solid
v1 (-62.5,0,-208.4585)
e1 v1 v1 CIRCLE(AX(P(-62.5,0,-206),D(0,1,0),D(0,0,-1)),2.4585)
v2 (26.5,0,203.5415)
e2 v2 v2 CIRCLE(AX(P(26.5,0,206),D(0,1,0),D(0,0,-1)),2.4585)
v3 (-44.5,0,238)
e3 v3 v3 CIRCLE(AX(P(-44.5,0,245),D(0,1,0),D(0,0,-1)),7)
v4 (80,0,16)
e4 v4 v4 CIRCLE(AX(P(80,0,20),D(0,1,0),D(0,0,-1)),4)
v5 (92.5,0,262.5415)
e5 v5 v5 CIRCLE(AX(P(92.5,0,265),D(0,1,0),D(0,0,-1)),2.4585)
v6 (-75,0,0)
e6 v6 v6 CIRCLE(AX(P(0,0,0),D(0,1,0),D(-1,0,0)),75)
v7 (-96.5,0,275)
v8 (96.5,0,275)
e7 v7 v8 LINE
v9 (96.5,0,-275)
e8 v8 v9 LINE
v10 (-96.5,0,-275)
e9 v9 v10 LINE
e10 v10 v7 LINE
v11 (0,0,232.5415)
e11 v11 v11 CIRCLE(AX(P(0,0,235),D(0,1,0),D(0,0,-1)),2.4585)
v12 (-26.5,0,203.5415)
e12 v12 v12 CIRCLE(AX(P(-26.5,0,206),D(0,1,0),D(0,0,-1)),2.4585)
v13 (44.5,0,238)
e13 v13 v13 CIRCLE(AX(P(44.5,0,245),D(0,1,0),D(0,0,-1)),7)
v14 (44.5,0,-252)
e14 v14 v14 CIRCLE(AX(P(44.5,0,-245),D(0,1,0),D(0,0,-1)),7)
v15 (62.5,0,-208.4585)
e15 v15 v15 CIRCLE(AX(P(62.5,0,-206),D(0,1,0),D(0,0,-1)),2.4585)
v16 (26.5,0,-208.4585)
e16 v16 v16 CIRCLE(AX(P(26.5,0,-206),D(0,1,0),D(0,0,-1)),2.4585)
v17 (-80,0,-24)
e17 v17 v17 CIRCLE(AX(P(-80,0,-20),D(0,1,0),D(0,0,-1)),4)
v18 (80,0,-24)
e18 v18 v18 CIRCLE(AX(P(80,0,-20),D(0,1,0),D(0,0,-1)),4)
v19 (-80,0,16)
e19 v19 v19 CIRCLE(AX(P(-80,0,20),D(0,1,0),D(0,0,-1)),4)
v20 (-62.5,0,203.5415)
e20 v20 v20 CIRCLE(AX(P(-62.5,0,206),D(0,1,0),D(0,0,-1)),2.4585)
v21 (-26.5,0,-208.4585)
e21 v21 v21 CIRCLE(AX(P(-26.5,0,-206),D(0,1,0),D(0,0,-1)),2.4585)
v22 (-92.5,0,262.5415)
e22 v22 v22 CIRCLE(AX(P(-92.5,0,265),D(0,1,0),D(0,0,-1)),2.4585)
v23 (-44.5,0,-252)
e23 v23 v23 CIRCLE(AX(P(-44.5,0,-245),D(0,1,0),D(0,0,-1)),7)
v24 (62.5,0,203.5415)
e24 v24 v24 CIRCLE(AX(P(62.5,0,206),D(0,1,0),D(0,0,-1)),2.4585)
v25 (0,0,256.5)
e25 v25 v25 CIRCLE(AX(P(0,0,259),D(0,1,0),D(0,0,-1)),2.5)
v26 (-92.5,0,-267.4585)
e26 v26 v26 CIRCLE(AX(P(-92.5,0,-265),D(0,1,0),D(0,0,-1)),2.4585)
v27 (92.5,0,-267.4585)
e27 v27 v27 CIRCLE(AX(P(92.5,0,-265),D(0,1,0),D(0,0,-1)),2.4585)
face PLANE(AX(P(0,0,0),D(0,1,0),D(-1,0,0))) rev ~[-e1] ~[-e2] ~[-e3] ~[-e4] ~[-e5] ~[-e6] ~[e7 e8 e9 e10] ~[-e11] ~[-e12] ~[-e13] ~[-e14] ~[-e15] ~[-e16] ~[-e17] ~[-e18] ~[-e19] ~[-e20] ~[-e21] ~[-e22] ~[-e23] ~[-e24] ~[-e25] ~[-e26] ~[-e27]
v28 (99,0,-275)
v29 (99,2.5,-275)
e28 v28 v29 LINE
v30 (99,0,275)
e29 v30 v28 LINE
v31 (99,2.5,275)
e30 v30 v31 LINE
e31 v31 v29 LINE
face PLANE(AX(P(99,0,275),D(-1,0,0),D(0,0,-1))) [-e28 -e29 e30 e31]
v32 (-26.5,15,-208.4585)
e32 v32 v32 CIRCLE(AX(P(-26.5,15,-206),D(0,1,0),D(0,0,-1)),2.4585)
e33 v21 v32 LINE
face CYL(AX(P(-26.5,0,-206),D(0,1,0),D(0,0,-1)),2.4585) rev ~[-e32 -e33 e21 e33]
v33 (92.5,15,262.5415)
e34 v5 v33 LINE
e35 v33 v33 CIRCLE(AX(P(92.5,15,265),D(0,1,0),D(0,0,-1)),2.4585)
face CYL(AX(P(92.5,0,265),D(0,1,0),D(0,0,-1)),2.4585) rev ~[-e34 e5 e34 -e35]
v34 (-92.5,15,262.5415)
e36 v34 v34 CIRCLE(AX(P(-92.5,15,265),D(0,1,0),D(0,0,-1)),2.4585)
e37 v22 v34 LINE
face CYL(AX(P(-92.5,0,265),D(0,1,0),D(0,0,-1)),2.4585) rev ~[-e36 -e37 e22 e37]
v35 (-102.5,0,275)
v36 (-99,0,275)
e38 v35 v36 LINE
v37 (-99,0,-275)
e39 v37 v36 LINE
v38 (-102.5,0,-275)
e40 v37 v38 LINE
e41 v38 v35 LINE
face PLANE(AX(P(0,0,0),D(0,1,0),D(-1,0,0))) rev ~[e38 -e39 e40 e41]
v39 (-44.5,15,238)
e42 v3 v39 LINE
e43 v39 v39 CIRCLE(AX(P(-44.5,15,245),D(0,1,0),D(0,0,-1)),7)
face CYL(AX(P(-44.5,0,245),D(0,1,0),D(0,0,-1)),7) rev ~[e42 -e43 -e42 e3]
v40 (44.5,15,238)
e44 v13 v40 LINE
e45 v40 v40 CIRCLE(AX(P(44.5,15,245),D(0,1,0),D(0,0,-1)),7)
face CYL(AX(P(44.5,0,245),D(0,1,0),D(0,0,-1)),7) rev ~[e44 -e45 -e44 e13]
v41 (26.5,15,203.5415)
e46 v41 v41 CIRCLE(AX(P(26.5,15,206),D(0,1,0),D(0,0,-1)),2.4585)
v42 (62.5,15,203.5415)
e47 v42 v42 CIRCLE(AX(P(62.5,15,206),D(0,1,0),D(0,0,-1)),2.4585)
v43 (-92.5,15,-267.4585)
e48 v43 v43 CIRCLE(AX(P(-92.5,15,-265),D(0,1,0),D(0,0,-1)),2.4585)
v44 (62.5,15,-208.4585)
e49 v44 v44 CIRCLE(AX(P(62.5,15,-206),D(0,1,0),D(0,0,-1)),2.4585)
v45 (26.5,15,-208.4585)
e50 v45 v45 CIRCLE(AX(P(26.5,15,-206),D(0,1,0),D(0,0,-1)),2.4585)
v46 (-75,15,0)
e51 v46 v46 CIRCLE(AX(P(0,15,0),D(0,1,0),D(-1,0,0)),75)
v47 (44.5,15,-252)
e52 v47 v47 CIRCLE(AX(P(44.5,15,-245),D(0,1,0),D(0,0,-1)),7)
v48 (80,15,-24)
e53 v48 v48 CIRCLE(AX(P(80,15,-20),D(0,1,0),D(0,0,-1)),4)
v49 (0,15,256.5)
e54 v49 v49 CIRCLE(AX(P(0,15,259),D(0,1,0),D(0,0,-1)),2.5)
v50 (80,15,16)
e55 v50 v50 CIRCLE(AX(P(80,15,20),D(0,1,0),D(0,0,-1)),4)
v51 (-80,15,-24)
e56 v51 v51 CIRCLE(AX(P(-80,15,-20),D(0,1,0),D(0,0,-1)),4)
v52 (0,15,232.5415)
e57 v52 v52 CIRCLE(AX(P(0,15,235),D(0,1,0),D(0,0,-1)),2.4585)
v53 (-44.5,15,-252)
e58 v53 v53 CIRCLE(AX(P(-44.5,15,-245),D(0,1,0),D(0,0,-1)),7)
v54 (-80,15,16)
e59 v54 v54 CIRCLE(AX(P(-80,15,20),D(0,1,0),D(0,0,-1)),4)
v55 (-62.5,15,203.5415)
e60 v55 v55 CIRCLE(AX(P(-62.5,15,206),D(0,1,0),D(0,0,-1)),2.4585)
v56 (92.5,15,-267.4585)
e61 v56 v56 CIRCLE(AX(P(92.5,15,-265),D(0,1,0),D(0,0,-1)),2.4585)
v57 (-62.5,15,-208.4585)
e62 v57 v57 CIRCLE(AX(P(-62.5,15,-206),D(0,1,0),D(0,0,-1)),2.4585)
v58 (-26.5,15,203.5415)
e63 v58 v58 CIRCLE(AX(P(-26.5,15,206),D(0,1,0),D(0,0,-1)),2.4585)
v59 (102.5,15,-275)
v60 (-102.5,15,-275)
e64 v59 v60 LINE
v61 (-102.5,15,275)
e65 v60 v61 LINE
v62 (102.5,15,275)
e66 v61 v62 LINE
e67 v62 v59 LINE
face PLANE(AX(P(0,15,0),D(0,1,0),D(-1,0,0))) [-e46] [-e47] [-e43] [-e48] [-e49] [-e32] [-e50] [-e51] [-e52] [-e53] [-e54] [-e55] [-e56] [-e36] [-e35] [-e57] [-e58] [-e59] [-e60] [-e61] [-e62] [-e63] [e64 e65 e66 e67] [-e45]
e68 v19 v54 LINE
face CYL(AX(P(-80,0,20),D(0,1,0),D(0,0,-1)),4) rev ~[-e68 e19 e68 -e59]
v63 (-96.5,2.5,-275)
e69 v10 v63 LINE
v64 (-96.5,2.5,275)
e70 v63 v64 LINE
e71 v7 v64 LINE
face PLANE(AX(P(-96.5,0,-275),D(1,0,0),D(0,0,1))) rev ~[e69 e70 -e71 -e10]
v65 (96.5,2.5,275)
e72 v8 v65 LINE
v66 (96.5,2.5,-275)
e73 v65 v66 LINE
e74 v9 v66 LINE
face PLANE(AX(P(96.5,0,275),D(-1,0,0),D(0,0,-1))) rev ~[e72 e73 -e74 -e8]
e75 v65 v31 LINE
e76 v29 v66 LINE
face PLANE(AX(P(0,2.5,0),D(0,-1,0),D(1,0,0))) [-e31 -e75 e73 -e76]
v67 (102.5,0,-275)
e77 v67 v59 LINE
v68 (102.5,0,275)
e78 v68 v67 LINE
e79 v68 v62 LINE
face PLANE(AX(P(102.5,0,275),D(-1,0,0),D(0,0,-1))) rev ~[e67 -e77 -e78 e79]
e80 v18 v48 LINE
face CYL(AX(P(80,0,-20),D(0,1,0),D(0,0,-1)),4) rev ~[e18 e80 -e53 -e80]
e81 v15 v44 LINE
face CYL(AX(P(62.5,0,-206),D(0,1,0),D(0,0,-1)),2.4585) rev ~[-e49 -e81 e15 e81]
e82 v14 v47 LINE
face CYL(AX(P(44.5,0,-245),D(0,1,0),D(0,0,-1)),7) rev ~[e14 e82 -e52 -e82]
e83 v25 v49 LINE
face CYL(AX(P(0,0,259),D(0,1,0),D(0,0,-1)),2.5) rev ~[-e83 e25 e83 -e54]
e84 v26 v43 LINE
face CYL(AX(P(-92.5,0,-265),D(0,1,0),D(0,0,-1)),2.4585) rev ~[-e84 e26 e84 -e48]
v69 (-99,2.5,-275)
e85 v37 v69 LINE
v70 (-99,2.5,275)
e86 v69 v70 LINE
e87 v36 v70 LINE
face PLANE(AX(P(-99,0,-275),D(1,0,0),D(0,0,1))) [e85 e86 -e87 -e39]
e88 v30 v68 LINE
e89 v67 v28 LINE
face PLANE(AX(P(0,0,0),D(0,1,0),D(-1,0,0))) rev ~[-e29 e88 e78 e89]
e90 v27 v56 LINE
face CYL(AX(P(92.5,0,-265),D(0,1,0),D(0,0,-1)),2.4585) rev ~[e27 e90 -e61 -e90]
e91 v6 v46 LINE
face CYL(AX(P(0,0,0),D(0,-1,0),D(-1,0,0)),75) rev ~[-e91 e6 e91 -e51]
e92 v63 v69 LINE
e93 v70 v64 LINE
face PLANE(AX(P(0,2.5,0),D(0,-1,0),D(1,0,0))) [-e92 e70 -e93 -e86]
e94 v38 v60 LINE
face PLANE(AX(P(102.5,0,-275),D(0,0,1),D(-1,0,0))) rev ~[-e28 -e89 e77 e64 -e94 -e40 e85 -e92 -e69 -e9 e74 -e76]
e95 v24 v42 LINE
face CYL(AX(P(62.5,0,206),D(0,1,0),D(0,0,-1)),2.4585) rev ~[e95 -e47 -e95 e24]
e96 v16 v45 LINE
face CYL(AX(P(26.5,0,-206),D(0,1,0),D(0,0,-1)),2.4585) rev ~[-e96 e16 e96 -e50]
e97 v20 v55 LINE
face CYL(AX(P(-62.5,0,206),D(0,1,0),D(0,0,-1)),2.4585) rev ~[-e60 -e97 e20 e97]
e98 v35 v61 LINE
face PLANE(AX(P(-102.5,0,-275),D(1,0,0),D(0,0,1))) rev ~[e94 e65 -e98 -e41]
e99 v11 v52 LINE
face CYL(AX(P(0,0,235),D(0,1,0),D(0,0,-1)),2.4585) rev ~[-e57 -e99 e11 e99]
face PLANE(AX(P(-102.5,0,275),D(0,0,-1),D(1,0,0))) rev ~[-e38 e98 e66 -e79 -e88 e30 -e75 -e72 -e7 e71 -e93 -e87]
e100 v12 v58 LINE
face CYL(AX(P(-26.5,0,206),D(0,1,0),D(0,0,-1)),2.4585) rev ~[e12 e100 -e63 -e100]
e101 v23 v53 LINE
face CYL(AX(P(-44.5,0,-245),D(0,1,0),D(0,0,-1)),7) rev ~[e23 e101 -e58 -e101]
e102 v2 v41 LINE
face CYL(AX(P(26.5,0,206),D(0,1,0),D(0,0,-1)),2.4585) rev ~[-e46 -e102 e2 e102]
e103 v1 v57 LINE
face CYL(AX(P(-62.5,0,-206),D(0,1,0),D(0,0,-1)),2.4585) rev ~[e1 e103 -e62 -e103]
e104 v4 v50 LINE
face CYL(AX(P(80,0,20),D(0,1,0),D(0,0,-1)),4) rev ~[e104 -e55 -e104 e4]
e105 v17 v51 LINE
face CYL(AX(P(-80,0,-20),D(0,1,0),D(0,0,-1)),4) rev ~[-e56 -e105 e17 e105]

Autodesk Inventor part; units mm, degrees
ref_plane "YZ Plane" through (0, 0, 0) normal (1, 0, 0) x (0, 1, 0)
ref_plane "XZ Plane" through (0, 0, 0) normal (0, 1, 0) x (-1, 0, 0)
ref_plane "XY Plane" through (0, 0, 0) normal (0, 0, 1) x (1, 0, 0)
sketch "Skizze2" plane through (0, 0, 0) normal (0, 1, 0) x (-1, 0, 0)
  circle A0 centre (0, 0) radius 75
  line L0 (-102.5, -275) -> (102.5, -275)
  line L1 (102.5, -275) -> (102.5, 275)
  line L2 (102.5, 275) -> (-102.5, 275)
  line L3 (-102.5, 275) -> (-102.5, -275)
  line L4 (-102.5, -275) -> (102.5, 275) construction
  line L5 (102.5, -275) -> (-102.5, 275) construction
  dimension "d8" = 150
  dimension "d9" = 205
  dimension "d10" = 550
extrude "Extrusion1" add sketch "Skizze2" along normal blind 15
sketch "Skizze3" plane through (0, 0, 0) normal (0, -1, 0) x (1, 0, 0)
  line L0 (-92.5, -265) -> (92.5, -265)
  line L1 (92.5, -265) -> (92.5, 265)
  line L2 (92.5, 265) -> (-92.5, 265)
  line L3 (-92.5, 265) -> (-92.5, -265)
  line L4 (-92.5, -265) -> (92.5, 265) construction
  line L5 (92.5, -265) -> (-92.5, 265) construction
  line L6 (-102.5, -275) -> (-102.5, 275) projected
  line L7 (102.5, 275) -> (102.5, -275) projected
  point P0 (0, 0)
  dimension "d13" = 185
  dimension "d14" = 530
  dimension "d86" = 205
hole "Bohrung1" at (92.5, 0, -265) at (-92.5, 0, -265) at (-92.5, 0, 265) at (92.5, 0, 265) direction (0, 1, 0) diameter 4.917 end through all thread size "M6x1" class "6H" standard "ISO Metric profile"
sketch "Skizze6" plane through (0, 0, 0) normal (0, -1, 0) x (1, 0, 0)
  line L0 (99, 275) -> (99, -275)
  line L1 (102.5, 275) -> (102.5, -275) projected
  line L2 (96.5, 275) -> (96.5, -275)
  line L3 (-99, -275) -> (-99, 275)
  line L4 (-96.5, -275) -> (-96.5, 275)
  line L5 (102.5, -275) -> (-102.5, -275) projected
  line L6 (96.5, -275) -> (99, -275)
  line L7 (-96.5, -275) -> (-99, -275)
  line L8 (-102.5, 275) -> (102.5, 275) projected
  line L9 (-96.5, 275) -> (-99, 275)
  line L10 (99, 275) -> (96.5, 275)
  line L11 (-102.5, -275) -> (-102.5, 275) projected
  point P0 (0, 0)
  point P1 (99, 275)
  point P2 (96.5, 275)
  dimension "d68" = 2.5
  dimension "d70" = 2.5
  dimension "d84" = 198
  dimension "d85" = 99
extrude "Extrusion2" cut sketch "Skizze6" against normal blind 2.5 contours L0 L5 L2 L8 | L4 L5 L3 L8
sketch "Skizze7" plane through (0, 0, 0) normal (0, -1, 0) x (1, 0, 0)
  line L0 (-80, -20) -> (80, -20)
  line L1 (80, -20) -> (80, 20)
  line L2 (80, 20) -> (-80, 20)
  line L3 (-80, 20) -> (-80, -20)
  line L4 (-80, -20) -> (80, 20) construction
  line L5 (80, -20) -> (-80, 20) construction
  point P0 (0, 0)
  dimension "d74" = 160
  dimension "d75" = 40
hole "Bohrung6" at (-80, 0, 20) at (-80, 0, -20) at (80, 0, -20) at (80, 0, 20) direction (0, 1, 0) diameter 8 end through all
sketch "Skizze8" plane through (0, 0, 0) normal (0, -1, 0) x (1, 0, 0)
  line L0 (-62.5, -206) -> (62.5, -206)
  line L1 (62.5, -206) -> (62.5, 206)
  line L2 (62.5, 206) -> (-62.5, 206)
  line L3 (-62.5, 206) -> (-62.5, -206)
  line L4 (-62.5, -206) -> (62.5, 206) construction
  line L5 (62.5, -206) -> (-62.5, 206) construction
  line L6 (-26.5, -206) -> (26.5, -206)
  line L7 (26.5, -206) -> (26.5, 206)
  line L8 (26.5, 206) -> (-26.5, 206)
  line L9 (-26.5, 206) -> (-26.5, -206)
  line L10 (-26.5, -206) -> (26.5, 206) construction
  line L11 (26.5, -206) -> (-26.5, 206) construction
  point P0 (0, 0)
  dimension "d87" = 125
  dimension "d88" = 412
  dimension "d89" = 53
  dimension "d90" = 412
hole "Bohrung7" at (-62.5, 0, 206) at (-26.5, 0, 206) at (26.5, 0, 206) at (62.5, 0, 206) at (62.5, 0, -206) at (26.5, 0, -206) at (-26.5, 0, -206) at (-62.5, 0, -206) direction (0, 1, 0) diameter 4.917 end through all thread size "M6x1" class "6H" standard "ISO Metric profile"
sketch "Skizze9" plane through (0, 0, 0) normal (0, -1, 0) x (1, 0, 0)
  line L0 (-44.5, -245) -> (44.5, -245)
  line L1 (44.5, -245) -> (44.5, 245)
  line L2 (44.5, 245) -> (-44.5, 245)
  line L3 (-44.5, 245) -> (-44.5, -245)
  line L4 (-44.5, -245) -> (44.5, 245) construction
  line L5 (44.5, -245) -> (-44.5, 245) construction
  line L6 (102.5, 275) -> (102.5, -275) projected
  point P0 (0, 0)
  dimension "d98" = 490
  dimension "d99" = 58
hole "Bohrung8" at (44.5, 0, 245) at (-44.5, 0, 245) at (-44.5, 0, -245) at (44.5, 0, -245) direction (0, 1, 0) diameter 14 end through all
sketch "Skizze10" plane through (0, 0, 0) normal (0, -1, 0) x (1, 0, 0)
  line L0 (-96.5, 275) -> (96.5, 275) projected
  line L1 (-102.5, -275) -> (-102.5, 275) projected
  point P0 (0, 0)
  point P1 (0, 235)
  point P2 (0, 259)
  dimension "d107" = 40
  dimension "d108" = 102.5
  dimension "d116" = 16
  dimension "d117" = 102.5
hole "Bohrung9" at (0, 0, 235) direction (0, 1, 0) diameter 4.917 end through all thread size "M6x1" class "6H" standard "ISO Metric profile"
sketch "Skizze11" plane through (0, 0, 0) normal (0, -1, 0) x (1, 0, 0)
  line L0 (-102.5, -275) -> (-102.5, 275) projected
  line L1 (-96.5, 275) -> (96.5, 275) projected
  point P0 (0, 0)
  point P1 (0, 259)
  dimension "d118" = 102.5
  dimension "d119" = 16
hole "Bohrung10" at (0, 0, 259) direction (0, 1, 0) diameter 5 end through all
equation "\"d70\" = d68"
equation "\"d85\" = 0.5 * d84"
properties part number "Grundplatte 2.0"
